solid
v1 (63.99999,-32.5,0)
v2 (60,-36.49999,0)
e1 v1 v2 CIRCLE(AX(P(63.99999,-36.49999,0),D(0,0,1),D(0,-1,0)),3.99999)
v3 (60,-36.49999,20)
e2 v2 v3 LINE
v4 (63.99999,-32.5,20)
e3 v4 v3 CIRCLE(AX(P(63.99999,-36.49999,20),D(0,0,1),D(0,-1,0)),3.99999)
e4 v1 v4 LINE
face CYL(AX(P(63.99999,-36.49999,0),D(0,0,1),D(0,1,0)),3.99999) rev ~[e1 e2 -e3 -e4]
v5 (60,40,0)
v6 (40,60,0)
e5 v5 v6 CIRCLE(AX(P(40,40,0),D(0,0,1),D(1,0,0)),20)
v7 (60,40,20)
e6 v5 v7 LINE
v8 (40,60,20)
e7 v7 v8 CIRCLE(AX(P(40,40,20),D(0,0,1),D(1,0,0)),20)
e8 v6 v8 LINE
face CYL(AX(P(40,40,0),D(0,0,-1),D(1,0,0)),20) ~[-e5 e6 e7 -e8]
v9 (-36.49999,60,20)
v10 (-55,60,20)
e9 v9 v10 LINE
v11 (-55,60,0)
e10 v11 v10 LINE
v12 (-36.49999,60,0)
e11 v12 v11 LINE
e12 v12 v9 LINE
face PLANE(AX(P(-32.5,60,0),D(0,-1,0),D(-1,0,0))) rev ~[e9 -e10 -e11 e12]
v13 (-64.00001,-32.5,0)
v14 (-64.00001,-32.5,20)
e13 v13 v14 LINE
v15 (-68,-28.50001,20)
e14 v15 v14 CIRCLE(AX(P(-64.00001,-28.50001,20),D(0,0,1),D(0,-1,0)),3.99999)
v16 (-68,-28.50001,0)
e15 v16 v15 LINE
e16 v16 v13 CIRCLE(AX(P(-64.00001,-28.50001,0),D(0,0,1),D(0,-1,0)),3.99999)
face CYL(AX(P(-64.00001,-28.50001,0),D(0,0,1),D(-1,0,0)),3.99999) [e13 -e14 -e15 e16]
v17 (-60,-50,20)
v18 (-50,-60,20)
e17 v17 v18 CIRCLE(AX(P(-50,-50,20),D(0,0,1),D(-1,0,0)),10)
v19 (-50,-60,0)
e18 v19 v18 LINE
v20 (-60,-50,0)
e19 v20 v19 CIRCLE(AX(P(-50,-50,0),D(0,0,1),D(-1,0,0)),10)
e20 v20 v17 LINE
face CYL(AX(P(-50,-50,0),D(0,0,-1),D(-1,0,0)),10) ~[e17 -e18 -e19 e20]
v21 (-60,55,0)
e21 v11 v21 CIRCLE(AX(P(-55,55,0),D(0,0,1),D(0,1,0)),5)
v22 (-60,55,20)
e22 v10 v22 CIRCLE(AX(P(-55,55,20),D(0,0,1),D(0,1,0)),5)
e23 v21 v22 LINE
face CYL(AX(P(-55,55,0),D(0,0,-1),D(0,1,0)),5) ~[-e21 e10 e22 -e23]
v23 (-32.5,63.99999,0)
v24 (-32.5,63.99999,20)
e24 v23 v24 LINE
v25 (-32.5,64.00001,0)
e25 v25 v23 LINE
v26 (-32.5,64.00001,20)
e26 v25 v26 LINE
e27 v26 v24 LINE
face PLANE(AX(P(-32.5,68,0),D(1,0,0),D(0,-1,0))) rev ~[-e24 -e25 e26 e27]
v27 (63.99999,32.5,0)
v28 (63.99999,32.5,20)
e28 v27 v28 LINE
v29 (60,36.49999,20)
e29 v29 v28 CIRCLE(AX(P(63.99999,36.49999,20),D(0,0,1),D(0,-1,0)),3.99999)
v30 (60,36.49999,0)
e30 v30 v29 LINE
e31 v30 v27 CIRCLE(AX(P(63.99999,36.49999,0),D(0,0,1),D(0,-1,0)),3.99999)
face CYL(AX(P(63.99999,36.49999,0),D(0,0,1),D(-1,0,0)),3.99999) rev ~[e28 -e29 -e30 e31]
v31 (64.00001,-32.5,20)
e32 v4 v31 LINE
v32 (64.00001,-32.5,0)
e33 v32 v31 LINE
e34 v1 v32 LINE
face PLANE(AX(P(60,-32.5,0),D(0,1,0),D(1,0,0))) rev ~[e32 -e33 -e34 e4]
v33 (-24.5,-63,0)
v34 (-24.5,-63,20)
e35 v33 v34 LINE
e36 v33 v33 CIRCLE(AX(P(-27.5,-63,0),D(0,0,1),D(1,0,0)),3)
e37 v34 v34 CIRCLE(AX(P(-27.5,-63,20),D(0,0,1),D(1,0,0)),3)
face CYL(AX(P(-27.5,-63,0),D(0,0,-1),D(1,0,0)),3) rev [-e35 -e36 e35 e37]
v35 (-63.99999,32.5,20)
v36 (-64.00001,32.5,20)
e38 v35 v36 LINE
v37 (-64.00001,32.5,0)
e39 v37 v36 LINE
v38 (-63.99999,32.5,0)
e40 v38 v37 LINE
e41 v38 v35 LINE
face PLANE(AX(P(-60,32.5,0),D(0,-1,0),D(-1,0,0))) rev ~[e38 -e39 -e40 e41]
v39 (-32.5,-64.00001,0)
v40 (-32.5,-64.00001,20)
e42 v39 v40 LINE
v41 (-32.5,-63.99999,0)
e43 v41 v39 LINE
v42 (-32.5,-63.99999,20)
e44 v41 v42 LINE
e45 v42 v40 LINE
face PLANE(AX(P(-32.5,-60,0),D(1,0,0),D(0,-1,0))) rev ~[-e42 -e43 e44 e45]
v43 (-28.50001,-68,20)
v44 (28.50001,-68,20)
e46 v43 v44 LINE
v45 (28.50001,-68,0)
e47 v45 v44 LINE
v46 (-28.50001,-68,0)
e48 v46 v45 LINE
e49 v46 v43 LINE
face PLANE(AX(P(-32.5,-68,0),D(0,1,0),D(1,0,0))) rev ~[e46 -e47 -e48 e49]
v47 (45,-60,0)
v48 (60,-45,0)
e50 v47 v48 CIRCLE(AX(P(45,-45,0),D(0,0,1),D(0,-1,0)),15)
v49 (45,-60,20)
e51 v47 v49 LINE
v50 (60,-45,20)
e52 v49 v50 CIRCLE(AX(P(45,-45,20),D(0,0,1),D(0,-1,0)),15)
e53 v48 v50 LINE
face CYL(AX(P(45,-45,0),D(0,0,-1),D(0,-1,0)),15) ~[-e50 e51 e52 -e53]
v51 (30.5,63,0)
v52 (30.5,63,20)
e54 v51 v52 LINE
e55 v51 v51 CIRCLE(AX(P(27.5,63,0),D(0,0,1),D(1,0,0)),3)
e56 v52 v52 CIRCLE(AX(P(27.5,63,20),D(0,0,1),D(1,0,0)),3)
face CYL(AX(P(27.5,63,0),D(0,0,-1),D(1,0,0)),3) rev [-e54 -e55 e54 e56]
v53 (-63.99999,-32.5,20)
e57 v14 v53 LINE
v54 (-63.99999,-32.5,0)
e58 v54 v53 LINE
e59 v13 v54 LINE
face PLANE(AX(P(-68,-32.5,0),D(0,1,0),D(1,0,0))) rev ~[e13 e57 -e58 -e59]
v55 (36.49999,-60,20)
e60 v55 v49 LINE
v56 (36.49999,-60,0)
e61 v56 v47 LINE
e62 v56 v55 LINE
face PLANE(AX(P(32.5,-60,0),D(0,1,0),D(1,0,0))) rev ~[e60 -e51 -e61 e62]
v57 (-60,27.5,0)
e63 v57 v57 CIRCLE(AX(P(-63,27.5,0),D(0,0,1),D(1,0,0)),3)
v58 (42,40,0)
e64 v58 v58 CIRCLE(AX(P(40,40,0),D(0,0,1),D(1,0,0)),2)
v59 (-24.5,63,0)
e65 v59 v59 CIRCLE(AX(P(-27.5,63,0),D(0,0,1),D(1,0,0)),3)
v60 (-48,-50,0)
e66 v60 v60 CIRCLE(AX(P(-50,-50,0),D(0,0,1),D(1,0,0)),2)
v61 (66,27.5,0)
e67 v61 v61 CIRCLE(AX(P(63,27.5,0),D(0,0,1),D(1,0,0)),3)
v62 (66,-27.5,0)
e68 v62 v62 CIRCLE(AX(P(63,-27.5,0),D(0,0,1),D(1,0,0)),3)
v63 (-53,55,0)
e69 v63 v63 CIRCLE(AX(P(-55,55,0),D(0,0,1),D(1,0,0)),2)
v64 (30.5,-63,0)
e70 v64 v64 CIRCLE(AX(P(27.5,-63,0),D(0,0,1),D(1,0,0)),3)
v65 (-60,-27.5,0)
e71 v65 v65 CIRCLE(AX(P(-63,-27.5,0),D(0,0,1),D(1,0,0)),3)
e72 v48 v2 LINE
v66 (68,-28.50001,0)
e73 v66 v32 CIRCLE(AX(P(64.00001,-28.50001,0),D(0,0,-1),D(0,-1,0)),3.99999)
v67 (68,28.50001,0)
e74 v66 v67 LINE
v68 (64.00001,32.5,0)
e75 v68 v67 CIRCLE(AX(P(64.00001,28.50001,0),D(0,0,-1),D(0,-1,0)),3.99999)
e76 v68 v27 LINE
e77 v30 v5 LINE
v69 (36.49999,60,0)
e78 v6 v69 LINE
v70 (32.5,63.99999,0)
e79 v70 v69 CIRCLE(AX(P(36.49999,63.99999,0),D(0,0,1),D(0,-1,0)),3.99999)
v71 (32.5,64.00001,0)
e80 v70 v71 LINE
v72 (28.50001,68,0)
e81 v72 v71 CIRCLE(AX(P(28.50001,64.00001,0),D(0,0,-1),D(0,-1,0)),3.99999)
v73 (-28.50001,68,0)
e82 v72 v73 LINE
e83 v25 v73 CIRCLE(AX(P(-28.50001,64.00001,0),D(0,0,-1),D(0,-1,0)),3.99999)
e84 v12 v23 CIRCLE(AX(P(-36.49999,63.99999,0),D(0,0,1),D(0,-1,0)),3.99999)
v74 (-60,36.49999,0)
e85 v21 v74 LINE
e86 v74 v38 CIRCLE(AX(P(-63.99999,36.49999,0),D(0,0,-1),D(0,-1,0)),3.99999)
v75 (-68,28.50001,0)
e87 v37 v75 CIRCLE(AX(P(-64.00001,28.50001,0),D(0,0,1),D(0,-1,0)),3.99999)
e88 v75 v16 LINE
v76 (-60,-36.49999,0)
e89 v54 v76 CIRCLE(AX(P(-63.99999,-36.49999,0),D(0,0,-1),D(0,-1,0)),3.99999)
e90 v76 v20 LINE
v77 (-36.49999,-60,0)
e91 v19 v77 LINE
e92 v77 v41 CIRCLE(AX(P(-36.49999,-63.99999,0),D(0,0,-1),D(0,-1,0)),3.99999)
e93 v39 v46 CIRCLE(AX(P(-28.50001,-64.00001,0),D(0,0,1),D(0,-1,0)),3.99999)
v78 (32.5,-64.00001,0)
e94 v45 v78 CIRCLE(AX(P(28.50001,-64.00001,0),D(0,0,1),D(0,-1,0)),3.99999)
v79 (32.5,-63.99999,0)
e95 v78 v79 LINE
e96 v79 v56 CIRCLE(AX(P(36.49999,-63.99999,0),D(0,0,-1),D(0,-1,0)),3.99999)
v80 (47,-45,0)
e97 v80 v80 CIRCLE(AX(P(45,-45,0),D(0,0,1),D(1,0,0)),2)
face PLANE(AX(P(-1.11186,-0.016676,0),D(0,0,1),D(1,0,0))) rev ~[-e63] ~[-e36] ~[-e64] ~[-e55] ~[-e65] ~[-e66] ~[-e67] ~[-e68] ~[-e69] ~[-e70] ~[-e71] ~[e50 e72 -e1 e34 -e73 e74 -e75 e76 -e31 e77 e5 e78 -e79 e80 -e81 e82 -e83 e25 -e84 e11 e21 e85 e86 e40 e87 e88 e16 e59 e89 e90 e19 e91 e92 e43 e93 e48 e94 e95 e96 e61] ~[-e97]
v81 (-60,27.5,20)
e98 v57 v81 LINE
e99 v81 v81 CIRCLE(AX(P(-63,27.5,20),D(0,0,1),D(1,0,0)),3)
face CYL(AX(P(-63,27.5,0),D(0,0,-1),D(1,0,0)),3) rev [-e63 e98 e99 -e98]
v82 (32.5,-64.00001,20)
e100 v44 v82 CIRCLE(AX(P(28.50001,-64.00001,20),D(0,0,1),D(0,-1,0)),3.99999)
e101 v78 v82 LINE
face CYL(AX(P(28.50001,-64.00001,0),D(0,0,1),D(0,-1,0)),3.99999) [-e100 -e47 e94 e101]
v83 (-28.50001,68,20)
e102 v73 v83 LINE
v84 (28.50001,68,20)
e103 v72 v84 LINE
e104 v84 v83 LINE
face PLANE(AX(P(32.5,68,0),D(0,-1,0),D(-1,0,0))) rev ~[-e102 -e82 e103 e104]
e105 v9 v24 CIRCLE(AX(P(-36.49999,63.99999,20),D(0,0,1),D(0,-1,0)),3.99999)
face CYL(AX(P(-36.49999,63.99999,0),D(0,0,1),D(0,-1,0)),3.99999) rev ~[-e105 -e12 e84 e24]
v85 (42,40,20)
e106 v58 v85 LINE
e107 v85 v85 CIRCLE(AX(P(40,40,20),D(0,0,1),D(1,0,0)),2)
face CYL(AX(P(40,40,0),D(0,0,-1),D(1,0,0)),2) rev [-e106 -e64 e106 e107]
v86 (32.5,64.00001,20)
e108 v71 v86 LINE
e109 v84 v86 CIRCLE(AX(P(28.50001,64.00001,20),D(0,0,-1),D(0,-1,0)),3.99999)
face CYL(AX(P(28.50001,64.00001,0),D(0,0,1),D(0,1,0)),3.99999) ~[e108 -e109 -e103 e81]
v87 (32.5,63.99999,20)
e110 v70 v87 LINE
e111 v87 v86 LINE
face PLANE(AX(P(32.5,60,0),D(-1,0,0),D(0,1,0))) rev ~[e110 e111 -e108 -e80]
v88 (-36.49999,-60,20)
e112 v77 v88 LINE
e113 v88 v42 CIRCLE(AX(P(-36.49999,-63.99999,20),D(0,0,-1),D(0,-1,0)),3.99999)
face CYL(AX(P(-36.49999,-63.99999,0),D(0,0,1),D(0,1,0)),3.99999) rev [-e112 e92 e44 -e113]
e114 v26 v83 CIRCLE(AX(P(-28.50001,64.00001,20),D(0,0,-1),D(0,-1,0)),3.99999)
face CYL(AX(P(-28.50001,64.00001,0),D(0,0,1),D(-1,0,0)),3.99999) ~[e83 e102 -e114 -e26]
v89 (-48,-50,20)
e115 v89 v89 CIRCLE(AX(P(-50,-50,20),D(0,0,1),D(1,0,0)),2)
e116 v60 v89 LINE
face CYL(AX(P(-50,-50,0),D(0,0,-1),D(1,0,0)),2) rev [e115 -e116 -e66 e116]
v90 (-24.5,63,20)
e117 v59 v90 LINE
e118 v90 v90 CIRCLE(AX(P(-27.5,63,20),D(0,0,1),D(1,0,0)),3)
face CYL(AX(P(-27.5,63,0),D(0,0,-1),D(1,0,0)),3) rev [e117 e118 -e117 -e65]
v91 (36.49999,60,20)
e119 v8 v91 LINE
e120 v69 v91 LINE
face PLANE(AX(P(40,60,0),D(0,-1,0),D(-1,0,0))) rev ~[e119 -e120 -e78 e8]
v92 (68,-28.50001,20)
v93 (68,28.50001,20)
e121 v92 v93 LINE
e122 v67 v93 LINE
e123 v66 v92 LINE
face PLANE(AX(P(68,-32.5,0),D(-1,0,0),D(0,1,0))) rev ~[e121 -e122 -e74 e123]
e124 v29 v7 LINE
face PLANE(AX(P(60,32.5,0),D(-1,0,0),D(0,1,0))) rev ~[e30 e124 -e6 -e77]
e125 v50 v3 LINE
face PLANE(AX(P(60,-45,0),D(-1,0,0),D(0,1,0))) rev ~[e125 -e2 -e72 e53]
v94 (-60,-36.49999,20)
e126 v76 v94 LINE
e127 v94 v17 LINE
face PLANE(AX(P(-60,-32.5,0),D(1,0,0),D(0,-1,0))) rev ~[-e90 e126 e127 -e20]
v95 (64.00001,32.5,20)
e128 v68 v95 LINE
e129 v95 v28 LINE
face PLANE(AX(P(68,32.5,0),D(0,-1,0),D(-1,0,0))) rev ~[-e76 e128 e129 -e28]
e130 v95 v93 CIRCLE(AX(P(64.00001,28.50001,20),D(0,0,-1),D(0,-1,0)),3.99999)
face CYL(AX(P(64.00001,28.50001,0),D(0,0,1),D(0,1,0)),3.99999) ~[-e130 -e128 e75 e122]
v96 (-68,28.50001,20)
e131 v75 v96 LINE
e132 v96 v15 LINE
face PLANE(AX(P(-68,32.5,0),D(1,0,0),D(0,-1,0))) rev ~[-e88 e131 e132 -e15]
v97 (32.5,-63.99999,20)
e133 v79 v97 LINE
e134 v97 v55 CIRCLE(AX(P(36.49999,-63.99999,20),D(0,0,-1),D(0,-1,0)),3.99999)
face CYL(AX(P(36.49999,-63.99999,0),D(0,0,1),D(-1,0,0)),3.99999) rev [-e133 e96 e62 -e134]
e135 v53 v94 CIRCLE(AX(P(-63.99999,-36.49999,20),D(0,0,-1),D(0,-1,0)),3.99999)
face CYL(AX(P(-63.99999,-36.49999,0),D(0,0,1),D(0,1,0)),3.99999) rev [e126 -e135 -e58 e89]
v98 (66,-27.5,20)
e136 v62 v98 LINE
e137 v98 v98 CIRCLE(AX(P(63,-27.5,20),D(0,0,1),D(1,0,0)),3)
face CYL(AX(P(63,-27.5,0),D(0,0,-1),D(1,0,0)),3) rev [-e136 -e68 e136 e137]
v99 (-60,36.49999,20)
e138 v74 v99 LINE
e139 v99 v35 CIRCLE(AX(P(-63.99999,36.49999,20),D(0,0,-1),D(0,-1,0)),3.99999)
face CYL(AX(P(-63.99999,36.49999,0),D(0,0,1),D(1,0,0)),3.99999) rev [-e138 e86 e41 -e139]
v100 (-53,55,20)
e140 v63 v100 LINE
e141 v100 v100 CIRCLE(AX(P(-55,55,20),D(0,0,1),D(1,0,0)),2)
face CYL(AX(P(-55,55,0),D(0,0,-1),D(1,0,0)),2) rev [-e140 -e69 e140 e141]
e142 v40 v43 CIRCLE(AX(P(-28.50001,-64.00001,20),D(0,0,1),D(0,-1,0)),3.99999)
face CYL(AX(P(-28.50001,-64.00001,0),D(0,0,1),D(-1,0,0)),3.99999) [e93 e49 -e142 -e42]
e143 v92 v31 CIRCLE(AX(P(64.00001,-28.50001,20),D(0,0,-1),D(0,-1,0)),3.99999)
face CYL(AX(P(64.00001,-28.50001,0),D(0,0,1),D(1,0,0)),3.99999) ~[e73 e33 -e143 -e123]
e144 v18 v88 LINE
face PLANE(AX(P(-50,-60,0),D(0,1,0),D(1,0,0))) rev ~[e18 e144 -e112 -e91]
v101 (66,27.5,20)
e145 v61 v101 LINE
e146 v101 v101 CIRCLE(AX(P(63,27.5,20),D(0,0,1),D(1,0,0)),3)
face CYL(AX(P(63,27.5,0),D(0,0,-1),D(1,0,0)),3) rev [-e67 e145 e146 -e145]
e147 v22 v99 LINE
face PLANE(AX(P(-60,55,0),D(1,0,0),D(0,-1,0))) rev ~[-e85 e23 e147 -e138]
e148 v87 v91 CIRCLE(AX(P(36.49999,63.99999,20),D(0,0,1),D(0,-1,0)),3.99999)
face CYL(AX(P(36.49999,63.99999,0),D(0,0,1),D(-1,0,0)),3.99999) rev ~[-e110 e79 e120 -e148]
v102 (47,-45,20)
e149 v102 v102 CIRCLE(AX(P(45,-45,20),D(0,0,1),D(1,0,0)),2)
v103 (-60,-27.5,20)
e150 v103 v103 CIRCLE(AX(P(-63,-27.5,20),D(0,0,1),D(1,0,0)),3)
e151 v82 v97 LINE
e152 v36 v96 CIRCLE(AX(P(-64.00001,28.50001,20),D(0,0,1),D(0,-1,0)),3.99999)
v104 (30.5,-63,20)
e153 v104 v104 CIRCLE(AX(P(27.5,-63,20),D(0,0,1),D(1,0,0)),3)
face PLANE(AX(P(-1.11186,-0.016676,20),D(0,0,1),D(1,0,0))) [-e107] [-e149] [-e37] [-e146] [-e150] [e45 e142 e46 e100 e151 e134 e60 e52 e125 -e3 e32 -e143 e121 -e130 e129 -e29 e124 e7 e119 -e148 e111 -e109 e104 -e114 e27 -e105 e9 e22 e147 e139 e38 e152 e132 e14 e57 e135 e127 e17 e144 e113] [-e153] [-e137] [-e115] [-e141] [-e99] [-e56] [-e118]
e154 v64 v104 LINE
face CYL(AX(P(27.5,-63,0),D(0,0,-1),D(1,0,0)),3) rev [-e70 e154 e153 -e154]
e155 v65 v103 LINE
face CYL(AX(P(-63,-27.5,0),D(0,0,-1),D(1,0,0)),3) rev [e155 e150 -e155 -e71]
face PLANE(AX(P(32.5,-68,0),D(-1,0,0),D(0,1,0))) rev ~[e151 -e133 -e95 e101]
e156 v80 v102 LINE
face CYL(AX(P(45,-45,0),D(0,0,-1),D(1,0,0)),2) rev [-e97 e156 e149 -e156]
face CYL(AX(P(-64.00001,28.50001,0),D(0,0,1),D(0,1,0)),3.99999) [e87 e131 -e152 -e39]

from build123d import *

# Parameters (mm, degrees)
F0_R     = 2
F0_R_2   = 3
F1_DEPTH = 20
F2_R     = 3.99999


# Not quite as in the source:
# - a fillet or chamfer is up to 0.001 mm smaller than in the source, because OpenCascade refuses the exact size


with BuildPart() as f1:
    # F0 (on Top) → F1 (new body)
    with BuildSketch(Plane.XY):
        with BuildLine():
            Line((-32.5, 60), (-55, 60))
            ThreePointArc((-55, 60), (-58.5355339059, 58.5355339059), (-60, 55))
            Line((-60, 55), (-60, 32.5))
            Line((-60, 32.5), (-68, 32.5))
            Line((-68, 32.5), (-68, -32.5))
            Line((-68, -32.5), (-60, -32.5))
            Line((-60, -32.5), (-60, -50))
            ThreePointArc((-60, -50), (-57.0710678119, -57.0710678119), (-50, -60))
            Line((-50, -60), (-32.5, -60))
            Line((-32.5, -60), (-32.5, -68))
            Line((-32.5, -68), (32.5, -68))
            Line((32.5, -68), (32.5, -60))
            Line((32.5, -60), (45, -60))
            ThreePointArc((45, -60), (55.6066017178, -55.6066017178), (60, -45))
            Line((60, -45), (60, -32.5))
            Line((60, -32.5), (68, -32.5))
            Line((68, -32.5), (68, 32.5))
            Line((68, 32.5), (60, 32.5))
            Line((60, 32.5), (60, 40))
            ThreePointArc((60, 40), (54.1421356237, 54.1421356237), (40, 60))
            Line((40, 60), (32.5, 60))
            Line((32.5, 60), (32.5, 68))
            Line((32.5, 68), (-32.5, 68))
            Line((-32.5, 68), (-32.5, 60))
        make_face()
        with Locations((-50, -50)):
            Circle(F0_R, mode=Mode.SUBTRACT)
        with Locations((-27.5, -63)):
            Circle(F0_R_2, mode=Mode.SUBTRACT)
        with Locations((-63, -27.5)):
            Circle(F0_R_2, mode=Mode.SUBTRACT)
        with Locations((27.5, -63)):
            Circle(F0_R_2, mode=Mode.SUBTRACT)
        with Locations((45, -45)):
            Circle(F0_R, mode=Mode.SUBTRACT)
        with Locations((63, -27.5)):
            Circle(F0_R_2, mode=Mode.SUBTRACT)
        with Locations((-63, 27.5)):
            Circle(F0_R_2, mode=Mode.SUBTRACT)
        with Locations((-55, 55)):
            Circle(F0_R, mode=Mode.SUBTRACT)
        with Locations((-27.5, 63)):
            Circle(F0_R_2, mode=Mode.SUBTRACT)
        with Locations((63, 27.5)):
            Circle(F0_R_2, mode=Mode.SUBTRACT)
        with Locations((27.5, 63)):
            Circle(F0_R_2, mode=Mode.SUBTRACT)
        with Locations((40, 40)):
            Circle(F0_R, mode=Mode.SUBTRACT)
    extrude(amount=F1_DEPTH)

    # F2 (radius 4 in the source; OpenCascade refuses exactly that, so slightly less here)
    f2_edges = [f1.edges().sort_by_distance(p)[0] for p in [
        (-60, 32.5, 10),
        (-68, 32.5, 10),
        (-32.5, 60, 10),
        (-32.5, 68, 10),
        (32.5, 68, 10),
        (-68, -32.5, 10),
        (-32.5, -68, 10),
        (60, -32.5, 10),
        (68, -32.5, 10),
        (68, 32.5, 10),
        (32.5, -60, 10),
        (32.5, -68, 10),
        (-60, -32.5, 10),
        (-32.5, -60, 10),
        (60, 32.5, 10),
        (32.5, 60, 10),
    ]]
    fillet(f2_edges, radius=F2_R)


solid = f1.part
